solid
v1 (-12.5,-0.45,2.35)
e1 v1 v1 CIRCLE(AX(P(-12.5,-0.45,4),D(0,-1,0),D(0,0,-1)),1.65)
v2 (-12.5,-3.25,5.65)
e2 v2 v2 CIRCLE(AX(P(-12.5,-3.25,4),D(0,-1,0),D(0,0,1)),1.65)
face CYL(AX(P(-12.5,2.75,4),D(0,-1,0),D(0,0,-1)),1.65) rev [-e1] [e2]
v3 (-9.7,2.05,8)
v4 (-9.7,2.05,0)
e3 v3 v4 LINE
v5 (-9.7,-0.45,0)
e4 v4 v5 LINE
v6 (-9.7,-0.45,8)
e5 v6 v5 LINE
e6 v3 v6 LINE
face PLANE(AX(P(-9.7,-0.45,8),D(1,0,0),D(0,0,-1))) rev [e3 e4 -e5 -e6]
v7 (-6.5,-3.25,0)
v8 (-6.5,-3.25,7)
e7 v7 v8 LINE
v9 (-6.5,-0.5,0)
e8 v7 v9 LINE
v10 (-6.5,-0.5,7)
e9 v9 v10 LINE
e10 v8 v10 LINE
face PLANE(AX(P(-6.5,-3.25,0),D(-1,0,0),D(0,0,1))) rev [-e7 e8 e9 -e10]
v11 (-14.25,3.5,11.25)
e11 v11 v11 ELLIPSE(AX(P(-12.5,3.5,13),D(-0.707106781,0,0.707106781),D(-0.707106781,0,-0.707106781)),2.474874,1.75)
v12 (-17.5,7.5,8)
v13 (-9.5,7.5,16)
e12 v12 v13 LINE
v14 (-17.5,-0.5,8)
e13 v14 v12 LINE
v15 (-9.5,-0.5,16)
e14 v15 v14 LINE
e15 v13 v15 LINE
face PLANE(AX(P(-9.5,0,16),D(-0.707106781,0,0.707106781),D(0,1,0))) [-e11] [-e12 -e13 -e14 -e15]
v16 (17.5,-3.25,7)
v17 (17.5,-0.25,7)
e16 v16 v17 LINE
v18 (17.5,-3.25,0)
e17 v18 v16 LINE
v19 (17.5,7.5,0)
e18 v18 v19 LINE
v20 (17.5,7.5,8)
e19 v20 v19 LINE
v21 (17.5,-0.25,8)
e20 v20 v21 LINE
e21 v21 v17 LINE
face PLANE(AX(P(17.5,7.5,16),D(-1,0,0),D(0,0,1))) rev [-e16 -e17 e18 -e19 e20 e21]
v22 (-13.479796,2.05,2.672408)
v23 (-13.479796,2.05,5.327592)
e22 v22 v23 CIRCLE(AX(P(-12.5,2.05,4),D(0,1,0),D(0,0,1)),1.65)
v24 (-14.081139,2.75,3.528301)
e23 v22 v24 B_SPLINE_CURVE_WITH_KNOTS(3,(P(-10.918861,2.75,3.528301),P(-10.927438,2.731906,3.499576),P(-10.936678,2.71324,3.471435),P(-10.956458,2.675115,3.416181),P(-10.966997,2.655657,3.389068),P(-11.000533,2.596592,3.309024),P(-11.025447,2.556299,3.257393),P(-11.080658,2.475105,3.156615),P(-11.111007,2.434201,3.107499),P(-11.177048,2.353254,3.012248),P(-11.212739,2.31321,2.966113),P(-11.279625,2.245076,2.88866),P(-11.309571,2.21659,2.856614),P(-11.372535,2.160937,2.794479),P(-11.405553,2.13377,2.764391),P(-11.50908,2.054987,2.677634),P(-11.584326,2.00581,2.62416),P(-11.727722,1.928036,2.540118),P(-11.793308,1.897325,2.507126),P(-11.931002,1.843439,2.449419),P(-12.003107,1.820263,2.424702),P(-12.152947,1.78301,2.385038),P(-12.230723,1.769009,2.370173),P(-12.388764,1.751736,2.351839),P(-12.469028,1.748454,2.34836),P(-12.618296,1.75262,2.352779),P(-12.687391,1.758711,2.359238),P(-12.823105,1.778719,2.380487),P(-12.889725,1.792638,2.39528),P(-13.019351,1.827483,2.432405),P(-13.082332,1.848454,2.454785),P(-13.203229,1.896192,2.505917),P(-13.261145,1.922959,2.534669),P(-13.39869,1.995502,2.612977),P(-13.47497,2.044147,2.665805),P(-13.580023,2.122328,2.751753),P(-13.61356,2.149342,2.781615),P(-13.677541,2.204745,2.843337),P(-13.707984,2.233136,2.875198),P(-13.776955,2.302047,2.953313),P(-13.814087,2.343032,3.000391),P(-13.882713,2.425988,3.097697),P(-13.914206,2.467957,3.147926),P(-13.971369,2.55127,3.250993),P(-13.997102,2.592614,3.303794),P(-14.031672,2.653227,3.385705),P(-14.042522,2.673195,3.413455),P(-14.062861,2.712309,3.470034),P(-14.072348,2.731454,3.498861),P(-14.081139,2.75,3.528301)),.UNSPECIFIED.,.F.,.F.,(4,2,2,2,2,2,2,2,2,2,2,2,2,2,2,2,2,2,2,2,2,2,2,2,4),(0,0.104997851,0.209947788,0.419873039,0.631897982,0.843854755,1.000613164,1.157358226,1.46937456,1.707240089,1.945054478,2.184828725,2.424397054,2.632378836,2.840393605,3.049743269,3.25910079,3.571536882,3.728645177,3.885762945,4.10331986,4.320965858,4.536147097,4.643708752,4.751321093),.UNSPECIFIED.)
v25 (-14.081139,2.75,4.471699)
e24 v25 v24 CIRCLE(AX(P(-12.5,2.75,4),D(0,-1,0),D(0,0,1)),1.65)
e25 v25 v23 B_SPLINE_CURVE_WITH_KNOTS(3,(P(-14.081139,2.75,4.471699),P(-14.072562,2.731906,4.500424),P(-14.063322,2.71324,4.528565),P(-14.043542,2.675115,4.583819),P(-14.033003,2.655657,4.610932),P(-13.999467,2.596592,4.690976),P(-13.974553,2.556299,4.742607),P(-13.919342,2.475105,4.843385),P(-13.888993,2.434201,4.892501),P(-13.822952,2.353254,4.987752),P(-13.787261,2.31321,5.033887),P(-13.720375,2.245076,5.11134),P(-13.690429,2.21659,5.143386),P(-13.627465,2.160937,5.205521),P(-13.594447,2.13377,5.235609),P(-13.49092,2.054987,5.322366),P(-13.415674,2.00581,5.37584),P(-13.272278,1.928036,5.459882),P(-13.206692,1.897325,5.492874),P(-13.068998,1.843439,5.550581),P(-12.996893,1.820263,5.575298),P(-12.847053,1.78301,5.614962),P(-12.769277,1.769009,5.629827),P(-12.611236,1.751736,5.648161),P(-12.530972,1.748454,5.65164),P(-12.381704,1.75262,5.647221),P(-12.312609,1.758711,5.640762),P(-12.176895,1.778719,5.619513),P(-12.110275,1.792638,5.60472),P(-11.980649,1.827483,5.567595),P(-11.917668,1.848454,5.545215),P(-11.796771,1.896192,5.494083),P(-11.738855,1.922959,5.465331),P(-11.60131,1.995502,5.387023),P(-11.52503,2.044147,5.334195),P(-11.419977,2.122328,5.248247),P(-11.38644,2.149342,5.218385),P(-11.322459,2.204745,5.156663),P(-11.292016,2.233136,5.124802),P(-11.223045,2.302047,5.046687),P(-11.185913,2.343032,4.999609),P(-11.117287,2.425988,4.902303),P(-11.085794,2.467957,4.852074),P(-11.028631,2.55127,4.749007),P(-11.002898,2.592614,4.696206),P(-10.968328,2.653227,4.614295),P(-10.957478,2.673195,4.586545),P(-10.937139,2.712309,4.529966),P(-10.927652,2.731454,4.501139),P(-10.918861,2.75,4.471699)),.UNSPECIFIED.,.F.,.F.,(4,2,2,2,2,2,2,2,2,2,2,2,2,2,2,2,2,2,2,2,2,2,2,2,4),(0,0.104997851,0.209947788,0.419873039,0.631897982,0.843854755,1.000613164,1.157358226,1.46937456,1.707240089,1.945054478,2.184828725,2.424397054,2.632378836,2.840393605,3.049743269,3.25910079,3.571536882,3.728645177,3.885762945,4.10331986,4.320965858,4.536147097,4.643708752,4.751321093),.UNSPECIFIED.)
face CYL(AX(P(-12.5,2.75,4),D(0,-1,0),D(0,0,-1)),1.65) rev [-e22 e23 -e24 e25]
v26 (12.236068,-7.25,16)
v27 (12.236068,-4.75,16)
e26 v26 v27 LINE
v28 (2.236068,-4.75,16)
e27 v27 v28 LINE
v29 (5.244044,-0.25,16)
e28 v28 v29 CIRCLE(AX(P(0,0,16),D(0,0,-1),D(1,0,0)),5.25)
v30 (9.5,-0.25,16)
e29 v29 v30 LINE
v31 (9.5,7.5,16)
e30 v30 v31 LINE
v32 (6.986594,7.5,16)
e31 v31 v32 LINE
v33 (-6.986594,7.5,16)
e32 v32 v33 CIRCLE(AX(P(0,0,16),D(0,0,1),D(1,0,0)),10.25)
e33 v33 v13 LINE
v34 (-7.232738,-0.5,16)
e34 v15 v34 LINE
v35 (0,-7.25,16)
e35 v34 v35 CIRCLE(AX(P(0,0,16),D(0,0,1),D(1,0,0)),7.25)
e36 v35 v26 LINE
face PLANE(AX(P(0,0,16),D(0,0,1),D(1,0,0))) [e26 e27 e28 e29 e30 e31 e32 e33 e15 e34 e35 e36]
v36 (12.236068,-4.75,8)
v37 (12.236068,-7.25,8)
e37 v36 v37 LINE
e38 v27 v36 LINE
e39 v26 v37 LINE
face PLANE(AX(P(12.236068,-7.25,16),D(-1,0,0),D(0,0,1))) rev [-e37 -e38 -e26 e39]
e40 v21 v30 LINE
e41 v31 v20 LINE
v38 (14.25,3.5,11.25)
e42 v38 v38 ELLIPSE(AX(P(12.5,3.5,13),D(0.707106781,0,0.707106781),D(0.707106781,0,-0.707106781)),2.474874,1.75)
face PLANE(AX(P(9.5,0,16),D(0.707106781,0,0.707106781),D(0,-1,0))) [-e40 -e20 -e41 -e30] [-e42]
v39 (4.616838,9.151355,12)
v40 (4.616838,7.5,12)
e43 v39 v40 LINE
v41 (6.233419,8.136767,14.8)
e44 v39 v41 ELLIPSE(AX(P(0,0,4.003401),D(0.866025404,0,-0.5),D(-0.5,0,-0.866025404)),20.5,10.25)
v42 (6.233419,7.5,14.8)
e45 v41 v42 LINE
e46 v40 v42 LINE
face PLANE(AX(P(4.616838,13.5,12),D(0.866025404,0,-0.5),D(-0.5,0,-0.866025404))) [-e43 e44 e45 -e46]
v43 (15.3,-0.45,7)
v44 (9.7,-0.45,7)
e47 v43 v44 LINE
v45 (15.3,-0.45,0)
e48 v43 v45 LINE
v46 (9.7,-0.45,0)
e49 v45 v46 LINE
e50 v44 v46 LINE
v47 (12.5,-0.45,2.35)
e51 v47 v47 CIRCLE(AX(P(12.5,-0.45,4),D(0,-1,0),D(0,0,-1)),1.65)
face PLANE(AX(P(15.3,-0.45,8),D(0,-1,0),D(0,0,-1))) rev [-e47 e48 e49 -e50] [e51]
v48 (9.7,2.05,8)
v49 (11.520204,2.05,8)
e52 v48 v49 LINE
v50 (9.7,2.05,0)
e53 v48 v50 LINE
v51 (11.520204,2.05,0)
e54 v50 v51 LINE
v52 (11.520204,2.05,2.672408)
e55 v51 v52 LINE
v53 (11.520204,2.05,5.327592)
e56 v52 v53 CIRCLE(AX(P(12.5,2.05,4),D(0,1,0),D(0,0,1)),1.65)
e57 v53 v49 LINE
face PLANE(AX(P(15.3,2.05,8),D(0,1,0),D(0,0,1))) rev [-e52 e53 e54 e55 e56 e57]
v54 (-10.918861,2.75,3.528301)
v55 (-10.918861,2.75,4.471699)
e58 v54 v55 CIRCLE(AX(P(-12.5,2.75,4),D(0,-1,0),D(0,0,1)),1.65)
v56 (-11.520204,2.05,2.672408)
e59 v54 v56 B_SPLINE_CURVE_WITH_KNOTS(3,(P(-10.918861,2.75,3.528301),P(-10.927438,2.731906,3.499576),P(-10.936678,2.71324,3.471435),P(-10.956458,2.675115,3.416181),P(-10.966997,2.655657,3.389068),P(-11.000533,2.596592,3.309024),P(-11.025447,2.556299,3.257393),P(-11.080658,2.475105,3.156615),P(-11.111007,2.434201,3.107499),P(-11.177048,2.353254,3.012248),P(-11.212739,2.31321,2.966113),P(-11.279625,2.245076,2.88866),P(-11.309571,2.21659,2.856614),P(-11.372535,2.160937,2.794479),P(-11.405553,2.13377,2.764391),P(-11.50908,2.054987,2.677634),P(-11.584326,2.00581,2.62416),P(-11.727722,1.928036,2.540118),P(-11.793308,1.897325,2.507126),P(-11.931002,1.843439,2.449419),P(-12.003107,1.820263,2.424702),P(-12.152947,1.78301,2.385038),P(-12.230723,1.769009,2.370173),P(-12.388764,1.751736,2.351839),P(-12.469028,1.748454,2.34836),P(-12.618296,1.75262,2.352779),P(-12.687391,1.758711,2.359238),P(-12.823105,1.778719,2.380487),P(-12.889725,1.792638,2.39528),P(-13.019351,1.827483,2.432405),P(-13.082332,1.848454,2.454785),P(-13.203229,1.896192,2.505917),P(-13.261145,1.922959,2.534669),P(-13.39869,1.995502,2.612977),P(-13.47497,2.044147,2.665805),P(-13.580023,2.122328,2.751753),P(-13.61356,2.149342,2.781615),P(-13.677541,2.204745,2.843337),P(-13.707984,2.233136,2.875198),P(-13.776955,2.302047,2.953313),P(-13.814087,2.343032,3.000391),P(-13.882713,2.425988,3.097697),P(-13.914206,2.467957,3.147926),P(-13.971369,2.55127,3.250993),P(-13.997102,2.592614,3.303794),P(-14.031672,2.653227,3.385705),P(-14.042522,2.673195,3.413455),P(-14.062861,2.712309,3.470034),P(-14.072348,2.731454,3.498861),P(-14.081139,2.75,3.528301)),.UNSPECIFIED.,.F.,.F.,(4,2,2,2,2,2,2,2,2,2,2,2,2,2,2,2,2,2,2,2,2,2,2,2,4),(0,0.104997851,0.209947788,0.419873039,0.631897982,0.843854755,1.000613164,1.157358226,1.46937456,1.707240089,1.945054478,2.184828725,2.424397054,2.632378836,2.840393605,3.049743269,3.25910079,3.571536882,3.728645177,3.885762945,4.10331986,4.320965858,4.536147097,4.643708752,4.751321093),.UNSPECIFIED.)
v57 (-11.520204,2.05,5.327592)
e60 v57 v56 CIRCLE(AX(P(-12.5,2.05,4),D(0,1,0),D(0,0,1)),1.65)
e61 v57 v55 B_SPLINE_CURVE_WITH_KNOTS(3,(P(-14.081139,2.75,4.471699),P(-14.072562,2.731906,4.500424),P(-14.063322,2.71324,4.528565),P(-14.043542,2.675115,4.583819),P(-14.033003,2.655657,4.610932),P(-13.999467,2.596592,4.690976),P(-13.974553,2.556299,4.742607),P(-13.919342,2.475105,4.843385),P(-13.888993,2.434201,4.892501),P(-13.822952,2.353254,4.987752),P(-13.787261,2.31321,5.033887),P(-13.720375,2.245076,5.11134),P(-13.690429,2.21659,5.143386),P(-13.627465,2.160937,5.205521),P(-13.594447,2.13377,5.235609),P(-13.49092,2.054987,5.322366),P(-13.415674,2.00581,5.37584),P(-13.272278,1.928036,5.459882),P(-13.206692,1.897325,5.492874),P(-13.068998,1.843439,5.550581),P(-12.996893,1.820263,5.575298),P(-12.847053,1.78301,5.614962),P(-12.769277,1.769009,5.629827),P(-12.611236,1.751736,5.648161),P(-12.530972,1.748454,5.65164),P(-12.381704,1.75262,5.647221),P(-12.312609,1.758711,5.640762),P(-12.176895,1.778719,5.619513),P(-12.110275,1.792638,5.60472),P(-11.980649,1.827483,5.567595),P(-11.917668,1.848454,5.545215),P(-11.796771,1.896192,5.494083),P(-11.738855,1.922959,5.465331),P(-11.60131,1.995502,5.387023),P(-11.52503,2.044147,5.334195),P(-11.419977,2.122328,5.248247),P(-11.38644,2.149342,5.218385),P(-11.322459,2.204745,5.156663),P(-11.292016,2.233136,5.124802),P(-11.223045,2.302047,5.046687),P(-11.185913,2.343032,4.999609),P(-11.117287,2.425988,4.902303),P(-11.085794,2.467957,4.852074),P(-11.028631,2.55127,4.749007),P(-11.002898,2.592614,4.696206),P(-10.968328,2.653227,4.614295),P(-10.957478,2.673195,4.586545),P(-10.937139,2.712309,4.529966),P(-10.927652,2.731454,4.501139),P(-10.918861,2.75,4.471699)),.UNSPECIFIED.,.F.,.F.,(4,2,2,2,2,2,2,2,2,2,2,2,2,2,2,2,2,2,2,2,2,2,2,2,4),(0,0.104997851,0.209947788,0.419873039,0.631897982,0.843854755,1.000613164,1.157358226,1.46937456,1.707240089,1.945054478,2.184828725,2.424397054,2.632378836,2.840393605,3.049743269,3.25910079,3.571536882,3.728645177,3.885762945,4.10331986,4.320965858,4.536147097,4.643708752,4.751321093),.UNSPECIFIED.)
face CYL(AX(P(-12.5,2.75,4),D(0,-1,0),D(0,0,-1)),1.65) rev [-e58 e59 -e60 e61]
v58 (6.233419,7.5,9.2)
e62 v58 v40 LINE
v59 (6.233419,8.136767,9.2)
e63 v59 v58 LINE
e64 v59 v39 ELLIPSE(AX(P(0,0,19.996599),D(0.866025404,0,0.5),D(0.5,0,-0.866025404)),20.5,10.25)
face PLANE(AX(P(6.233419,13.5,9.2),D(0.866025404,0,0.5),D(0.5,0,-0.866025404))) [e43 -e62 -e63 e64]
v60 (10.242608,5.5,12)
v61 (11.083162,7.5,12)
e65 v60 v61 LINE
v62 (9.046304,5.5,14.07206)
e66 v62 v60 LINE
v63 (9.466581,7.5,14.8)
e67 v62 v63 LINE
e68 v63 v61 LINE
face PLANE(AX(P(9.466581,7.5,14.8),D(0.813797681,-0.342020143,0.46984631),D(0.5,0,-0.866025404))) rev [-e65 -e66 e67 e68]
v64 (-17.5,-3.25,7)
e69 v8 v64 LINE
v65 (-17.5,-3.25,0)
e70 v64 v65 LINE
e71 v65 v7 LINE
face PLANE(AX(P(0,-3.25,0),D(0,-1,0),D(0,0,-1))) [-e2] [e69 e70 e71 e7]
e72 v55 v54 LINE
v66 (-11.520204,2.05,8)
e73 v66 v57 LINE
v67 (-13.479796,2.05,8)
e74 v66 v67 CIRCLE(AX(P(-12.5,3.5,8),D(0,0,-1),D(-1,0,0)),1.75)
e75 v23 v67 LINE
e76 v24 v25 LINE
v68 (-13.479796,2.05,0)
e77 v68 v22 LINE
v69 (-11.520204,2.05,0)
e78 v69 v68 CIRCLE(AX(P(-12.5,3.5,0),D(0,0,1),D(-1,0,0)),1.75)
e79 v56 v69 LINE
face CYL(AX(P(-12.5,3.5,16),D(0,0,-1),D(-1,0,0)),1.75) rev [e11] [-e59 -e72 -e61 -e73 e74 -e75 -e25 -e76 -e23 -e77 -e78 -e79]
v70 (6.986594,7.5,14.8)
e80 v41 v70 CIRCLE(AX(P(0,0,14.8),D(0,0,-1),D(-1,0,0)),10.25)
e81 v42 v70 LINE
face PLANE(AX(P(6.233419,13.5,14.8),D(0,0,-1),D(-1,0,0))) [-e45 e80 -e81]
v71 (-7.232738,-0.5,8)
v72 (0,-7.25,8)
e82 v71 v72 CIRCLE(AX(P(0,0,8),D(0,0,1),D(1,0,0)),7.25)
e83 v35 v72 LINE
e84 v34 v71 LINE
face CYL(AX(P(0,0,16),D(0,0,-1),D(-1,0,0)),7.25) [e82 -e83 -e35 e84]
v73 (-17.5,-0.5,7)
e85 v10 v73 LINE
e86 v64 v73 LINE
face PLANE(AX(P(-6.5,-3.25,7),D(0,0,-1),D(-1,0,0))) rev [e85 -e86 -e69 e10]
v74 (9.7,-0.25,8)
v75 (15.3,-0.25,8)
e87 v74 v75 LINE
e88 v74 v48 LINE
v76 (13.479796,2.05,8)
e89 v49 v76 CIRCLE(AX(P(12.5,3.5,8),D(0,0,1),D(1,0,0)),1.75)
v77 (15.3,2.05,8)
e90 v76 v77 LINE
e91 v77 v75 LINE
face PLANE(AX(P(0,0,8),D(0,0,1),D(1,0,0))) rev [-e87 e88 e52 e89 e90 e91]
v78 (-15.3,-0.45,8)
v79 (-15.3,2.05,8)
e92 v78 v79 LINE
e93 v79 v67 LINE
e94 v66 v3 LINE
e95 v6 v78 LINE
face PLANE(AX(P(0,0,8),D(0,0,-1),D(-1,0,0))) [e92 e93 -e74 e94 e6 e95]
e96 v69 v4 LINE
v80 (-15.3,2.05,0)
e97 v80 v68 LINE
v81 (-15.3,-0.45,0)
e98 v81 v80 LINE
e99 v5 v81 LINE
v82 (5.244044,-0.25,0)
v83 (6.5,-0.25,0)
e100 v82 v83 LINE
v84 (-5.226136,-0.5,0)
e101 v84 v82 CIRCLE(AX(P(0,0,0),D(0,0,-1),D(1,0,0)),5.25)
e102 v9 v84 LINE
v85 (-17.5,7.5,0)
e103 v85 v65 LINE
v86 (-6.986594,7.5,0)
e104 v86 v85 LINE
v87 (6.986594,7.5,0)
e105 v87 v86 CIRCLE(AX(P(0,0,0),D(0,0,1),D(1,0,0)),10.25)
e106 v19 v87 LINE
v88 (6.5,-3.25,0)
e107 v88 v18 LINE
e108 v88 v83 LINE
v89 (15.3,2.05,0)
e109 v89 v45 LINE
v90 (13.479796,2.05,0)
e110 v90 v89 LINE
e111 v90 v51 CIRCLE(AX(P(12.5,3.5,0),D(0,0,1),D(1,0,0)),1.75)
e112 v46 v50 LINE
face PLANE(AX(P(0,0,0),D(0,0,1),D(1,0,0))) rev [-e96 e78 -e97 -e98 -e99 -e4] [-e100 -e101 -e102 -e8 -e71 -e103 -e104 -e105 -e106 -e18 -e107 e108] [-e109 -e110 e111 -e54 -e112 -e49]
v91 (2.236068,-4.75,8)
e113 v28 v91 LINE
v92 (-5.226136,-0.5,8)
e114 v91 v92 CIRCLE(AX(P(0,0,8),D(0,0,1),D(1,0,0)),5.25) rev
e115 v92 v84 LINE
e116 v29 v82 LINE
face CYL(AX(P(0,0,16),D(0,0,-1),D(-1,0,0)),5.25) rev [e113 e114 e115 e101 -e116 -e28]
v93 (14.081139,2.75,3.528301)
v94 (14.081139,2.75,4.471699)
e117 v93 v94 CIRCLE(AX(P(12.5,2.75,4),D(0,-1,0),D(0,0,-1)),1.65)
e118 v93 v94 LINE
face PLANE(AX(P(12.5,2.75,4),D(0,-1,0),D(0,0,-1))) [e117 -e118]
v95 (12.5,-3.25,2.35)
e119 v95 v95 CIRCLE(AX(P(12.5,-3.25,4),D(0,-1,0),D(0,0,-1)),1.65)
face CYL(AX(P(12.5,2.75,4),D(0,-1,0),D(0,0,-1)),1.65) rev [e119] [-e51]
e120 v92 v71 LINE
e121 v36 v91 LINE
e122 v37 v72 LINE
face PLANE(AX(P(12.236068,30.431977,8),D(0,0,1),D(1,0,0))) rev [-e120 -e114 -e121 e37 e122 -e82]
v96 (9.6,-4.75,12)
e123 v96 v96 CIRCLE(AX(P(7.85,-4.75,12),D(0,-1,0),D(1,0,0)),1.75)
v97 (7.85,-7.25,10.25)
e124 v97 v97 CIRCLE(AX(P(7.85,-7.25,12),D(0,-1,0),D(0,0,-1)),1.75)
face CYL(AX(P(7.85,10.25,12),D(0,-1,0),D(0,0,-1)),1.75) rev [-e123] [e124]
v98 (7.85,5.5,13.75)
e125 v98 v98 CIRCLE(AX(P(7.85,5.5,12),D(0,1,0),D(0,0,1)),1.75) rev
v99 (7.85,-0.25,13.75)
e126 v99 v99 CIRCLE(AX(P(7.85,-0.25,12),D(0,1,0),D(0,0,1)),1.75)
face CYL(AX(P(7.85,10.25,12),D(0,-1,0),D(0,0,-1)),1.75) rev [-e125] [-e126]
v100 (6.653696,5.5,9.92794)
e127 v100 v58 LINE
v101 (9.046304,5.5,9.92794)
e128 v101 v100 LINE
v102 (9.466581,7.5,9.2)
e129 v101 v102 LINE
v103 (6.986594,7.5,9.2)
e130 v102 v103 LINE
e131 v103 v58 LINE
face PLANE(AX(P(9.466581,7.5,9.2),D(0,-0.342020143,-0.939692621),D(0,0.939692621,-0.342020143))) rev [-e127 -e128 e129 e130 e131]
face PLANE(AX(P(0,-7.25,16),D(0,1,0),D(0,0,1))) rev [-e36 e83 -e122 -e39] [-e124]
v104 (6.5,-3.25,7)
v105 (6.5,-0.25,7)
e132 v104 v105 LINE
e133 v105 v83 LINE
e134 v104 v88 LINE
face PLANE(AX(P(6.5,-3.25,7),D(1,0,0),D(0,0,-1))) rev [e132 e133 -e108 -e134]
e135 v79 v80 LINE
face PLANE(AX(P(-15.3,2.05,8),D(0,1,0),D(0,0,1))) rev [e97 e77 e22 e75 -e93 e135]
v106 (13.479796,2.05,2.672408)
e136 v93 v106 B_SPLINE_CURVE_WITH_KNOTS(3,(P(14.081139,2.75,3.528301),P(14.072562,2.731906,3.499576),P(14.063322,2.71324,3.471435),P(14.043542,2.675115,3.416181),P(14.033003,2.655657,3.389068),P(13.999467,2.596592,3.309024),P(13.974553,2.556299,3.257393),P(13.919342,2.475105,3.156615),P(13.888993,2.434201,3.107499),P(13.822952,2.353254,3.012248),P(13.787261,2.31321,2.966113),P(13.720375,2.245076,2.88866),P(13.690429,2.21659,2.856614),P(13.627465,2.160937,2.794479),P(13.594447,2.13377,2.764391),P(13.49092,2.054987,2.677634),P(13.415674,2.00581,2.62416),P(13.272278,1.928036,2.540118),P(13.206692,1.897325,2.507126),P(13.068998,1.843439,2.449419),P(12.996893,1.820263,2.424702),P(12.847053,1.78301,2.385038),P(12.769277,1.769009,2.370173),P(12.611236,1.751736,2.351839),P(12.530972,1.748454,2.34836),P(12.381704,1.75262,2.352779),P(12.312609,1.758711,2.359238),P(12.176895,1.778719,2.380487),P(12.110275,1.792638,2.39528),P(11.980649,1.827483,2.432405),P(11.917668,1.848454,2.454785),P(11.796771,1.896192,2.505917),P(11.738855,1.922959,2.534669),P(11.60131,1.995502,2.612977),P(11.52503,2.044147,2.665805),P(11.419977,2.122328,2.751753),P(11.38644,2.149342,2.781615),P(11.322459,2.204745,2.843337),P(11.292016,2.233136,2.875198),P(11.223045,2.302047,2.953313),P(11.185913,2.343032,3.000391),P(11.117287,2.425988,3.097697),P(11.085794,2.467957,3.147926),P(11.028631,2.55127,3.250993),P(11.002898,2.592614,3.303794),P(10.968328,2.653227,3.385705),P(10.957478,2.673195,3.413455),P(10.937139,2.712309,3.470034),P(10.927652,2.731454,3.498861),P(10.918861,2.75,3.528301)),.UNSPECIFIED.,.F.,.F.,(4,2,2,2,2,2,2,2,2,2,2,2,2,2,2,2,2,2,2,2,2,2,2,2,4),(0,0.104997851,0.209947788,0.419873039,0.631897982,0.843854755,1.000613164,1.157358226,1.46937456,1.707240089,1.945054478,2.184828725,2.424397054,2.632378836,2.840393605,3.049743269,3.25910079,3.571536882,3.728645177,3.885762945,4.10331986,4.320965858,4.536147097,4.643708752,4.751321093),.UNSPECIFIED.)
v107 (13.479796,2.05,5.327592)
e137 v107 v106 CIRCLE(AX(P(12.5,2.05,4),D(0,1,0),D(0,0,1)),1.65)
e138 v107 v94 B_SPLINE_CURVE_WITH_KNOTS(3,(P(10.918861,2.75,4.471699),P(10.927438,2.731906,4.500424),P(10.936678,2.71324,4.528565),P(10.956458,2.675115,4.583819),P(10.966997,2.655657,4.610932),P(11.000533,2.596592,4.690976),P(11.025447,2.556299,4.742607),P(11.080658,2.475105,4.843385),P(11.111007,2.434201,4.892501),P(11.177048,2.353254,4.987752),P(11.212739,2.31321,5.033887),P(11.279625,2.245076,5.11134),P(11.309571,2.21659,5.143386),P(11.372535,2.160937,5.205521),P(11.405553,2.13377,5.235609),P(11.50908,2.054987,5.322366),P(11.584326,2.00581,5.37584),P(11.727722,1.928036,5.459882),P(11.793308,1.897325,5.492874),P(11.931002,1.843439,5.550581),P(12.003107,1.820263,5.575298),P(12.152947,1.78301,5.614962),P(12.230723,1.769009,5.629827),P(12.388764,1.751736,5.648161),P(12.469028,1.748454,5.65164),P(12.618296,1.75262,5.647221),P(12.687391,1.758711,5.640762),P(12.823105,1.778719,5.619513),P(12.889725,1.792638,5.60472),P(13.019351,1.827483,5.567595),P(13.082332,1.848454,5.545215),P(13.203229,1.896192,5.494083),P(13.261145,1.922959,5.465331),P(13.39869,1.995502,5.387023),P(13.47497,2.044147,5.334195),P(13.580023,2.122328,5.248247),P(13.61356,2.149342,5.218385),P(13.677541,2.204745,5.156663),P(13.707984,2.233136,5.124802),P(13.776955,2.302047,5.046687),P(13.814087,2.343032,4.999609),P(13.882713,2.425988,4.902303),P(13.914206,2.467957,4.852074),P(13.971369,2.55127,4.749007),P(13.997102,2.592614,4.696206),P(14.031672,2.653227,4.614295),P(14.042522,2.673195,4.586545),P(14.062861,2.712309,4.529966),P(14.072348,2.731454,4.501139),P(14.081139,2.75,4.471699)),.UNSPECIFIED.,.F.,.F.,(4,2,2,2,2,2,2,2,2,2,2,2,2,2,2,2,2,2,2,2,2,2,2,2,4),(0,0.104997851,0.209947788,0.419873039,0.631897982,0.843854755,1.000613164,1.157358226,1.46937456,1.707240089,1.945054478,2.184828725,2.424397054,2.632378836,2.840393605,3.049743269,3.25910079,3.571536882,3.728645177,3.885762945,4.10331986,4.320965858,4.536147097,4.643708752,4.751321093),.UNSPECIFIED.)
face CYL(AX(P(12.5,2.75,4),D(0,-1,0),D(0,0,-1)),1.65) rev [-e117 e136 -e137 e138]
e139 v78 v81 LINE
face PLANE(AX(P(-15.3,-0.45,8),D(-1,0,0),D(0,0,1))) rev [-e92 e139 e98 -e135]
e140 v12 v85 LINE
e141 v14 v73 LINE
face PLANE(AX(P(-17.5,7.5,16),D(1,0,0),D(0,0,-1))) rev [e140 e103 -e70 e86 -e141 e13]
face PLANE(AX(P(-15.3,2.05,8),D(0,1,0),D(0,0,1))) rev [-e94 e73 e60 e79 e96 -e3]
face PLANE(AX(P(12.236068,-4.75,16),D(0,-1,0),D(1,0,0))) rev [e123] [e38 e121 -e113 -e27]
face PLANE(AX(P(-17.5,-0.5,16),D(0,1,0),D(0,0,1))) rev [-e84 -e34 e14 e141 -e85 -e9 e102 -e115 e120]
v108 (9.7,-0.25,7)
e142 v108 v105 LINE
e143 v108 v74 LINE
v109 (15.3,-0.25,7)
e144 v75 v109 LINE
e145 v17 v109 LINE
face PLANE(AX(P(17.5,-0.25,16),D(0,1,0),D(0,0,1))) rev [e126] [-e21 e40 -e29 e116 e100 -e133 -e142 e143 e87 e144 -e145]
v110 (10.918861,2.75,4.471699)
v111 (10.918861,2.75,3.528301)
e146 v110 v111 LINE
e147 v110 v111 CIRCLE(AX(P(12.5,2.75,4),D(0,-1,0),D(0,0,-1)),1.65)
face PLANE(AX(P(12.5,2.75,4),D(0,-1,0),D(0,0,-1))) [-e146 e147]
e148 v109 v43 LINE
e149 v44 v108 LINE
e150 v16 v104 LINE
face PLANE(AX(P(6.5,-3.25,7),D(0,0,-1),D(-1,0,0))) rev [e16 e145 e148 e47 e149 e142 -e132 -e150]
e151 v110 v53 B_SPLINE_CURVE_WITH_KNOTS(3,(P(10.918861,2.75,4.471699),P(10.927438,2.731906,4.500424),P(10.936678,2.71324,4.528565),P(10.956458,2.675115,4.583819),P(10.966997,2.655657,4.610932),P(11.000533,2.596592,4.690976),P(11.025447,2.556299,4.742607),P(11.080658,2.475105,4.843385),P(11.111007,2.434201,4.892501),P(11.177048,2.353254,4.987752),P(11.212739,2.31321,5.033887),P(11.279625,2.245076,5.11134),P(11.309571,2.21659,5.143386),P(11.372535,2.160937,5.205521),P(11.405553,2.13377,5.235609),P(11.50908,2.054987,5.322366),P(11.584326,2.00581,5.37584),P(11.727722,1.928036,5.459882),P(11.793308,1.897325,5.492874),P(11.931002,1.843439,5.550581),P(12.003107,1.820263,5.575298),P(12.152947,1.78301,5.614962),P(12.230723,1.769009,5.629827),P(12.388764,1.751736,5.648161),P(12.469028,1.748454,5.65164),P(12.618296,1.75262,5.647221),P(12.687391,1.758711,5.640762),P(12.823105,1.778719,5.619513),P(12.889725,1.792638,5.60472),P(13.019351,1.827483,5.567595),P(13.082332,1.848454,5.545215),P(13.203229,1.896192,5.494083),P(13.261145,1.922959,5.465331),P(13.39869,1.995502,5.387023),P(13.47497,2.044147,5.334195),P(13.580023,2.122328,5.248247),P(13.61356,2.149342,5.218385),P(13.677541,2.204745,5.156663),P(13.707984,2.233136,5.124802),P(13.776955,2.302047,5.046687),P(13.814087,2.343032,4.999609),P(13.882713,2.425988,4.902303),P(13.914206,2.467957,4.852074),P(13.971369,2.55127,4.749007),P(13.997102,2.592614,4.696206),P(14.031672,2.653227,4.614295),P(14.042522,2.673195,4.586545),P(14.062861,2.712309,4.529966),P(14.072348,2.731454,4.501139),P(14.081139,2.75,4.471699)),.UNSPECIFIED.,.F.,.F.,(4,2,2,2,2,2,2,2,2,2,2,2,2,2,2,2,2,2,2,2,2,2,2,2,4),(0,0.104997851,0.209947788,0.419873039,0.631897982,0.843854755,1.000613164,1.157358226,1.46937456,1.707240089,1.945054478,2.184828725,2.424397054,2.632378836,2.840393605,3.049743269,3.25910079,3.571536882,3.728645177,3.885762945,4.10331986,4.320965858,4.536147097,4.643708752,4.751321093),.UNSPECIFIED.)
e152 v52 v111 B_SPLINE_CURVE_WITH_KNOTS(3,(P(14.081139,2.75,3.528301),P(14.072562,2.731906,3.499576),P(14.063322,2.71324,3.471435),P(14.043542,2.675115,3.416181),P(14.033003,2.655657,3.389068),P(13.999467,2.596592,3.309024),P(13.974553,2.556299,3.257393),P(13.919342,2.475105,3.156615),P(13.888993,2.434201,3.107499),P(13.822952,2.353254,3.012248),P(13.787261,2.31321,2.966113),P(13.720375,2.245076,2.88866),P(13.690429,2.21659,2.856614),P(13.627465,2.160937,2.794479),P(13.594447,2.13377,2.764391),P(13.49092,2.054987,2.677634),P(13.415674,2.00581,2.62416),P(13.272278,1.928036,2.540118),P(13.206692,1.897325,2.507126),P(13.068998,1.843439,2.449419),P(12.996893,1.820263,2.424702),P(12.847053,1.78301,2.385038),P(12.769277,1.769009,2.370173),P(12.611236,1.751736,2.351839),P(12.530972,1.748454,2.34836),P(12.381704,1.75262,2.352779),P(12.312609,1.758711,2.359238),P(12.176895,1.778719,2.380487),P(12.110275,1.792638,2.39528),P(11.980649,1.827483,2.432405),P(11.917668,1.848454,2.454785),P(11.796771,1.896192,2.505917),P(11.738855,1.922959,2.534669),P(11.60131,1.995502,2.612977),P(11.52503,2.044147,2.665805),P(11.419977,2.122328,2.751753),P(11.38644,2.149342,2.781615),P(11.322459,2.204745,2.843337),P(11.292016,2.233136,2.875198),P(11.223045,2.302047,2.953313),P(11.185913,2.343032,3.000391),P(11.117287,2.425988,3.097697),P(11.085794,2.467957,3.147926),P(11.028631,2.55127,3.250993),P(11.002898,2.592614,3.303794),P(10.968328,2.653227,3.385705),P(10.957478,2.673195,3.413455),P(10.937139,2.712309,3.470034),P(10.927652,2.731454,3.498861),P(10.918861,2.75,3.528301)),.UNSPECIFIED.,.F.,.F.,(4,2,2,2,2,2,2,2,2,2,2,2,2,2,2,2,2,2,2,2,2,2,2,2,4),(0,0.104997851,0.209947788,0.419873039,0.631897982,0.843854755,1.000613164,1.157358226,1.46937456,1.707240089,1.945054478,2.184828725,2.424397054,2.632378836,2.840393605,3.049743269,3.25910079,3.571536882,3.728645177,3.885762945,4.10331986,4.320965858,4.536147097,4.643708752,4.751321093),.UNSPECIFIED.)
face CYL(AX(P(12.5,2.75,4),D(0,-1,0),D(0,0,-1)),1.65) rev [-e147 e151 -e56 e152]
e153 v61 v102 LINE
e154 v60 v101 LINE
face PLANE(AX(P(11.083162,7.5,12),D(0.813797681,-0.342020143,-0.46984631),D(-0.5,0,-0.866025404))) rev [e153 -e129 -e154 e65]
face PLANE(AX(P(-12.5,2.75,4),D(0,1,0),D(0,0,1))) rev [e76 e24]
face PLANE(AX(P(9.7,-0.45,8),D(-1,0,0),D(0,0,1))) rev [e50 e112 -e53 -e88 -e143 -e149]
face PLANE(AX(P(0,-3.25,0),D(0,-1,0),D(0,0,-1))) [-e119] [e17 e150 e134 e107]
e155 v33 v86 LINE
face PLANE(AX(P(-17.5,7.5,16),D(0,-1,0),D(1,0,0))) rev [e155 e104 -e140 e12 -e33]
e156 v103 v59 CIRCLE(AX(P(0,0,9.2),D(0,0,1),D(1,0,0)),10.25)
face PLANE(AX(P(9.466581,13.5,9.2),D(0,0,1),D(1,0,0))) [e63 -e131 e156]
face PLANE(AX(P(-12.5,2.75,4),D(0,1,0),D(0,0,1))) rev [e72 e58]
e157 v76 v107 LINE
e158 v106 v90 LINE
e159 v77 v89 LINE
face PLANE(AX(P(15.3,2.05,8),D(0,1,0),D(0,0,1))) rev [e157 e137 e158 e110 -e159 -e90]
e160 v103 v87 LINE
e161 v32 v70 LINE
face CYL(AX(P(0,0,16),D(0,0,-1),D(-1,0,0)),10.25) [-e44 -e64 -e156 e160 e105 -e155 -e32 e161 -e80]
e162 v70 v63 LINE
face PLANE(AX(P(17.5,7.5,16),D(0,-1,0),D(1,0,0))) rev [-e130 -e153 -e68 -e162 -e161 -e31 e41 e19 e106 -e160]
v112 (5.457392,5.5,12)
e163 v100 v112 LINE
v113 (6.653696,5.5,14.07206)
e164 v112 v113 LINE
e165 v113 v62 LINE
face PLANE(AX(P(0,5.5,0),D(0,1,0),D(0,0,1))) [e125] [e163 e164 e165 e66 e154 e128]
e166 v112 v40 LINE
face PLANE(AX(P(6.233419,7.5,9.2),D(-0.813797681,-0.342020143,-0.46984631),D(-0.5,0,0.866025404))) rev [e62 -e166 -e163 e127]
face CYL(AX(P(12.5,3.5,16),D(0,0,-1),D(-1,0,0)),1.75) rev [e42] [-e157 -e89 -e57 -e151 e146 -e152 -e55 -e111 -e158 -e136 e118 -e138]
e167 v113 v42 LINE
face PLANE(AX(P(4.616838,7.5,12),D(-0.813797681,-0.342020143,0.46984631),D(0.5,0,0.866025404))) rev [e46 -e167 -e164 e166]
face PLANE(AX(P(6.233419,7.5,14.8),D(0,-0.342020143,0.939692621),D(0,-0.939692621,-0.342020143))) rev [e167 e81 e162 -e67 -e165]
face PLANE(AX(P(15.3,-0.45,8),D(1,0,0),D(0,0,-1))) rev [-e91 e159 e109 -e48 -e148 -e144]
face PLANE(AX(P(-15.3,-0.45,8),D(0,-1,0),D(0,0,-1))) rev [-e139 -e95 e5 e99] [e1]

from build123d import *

# Parameters (mm, degrees)
ESBO_O1_R                       = 1.75
RESSALTO_EXTRUS_O1_DEPTH        = 16
ESBO_O3_R                       = 1.75
CORTE_EXTRUS_O2_DEPTH           = 30.470324057
CORTE_EXTRUS_O3_DEPTH           = 2
CORTE_EXTRUS_O3_TAPER           = 20
CORTE_EXTRUS_O3_OTHER_WAY_DEPTH = 6
CORTE_EXTRUS_O4_REACH           = 31.47
ESBO_O5_W                       = 29.879545061
ESBO_O5_H                       = 8
ESBO_O6_W                       = 11
ESBO_O6_H                       = 7
RESSALTO_EXTRUS_O2_DEPTH        = 3
ESBO_O7_W                       = 5.6
ESBO_O7_H                       = 2.5
CORTE_EXTRUS_O6_DEPTH           = 8
ESBO_O8_R                       = 1.65
CORTE_EXTRUS_O7_DEPTH           = 6
CHANFRO1_SIZE                   = 8


with BuildPart() as part:
    # Esboço1 → Ressalto-extrusão1 (new body)
    with BuildSketch(Plane.XY):
        with BuildLine():
            Line((17.5, 7.5), (6.986594306, 7.5))
            ThreePointArc((6.986594306, 7.5), (0, 10.25), (-6.986594306, 7.5))
            Line((-6.986594306, 7.5), (-17.5, 7.5))
            Line((-17.5, 7.5), (-17.5, -0.5))
            Line((-17.5, -0.5), (-7.232738071, -0.5))
            ThreePointArc((-7.232738071, -0.5), (-4.946589734, -5.300353762), (0, -7.25))
            Line((0, -7.25), (12.236067977, -7.25))
            Line((12.236067977, -7.25), (12.236067977, -4.75))
            Line((12.236067977, -4.75), (2.236067977, -4.75))
            ThreePointArc((2.236067977, -4.75), (-4.364690104, 2.917529829), (5.244044241, -0.25))
            Line((5.244044241, -0.25), (12.736067977, -0.25))
            Line((12.736067977, -0.25), (15.807189139, -0.25))
            Line((15.807189139, -0.25), (17.5, -0.25))
            Line((17.5, -0.25), (17.5, 7.5))
        make_face()
        with Locations((12.5, 3.5)):
            Circle(ESBO_O1_R, mode=Mode.SUBTRACT)
        with Locations(Location((-12.5, 3.5, 0), (0, 0, 180))):
            Circle(ESBO_O1_R, mode=Mode.SUBTRACT)
    extrude(amount=RESSALTO_EXTRUS_O1_DEPTH)

    # Esboço3 → Corte-extrusão2 (cut, through all)
    with BuildSketch(Plane.XZ.offset(7.25)):
        with Locations(Location((7.85, 12, 0), (0, 0, 240.437367967))):
            Circle(ESBO_O3_R)
    extrude(amount=-CORTE_EXTRUS_O2_DEPTH, mode=Mode.SUBTRACT)

    # Esboço4 → Corte-extrusão3 (cut)
    with BuildSketch(Plane(origin=(0, 7.5, 0), x_dir=(1, 0, 0), z_dir=(0, 1, 0))):
        Polygon((11.083161507, -12), (9.466580754, -9.2), (6.233419246, -9.2), (4.616838493, -12), (6.233419246, -14.8), (9.466580754, -14.8), align=None)
    extrude(amount=-CORTE_EXTRUS_O3_DEPTH, taper=CORTE_EXTRUS_O3_TAPER, mode=Mode.SUBTRACT)

    # Esboço4 → Corte-extrusão3 other way (cut)
    with BuildSketch(Plane(origin=(0, 7.5, 0), x_dir=(1, 0, 0), z_dir=(0, 1, 0))):
        Polygon((11.083161507, -12), (9.466580754, -9.2), (6.233419246, -9.2), (4.616838493, -12), (6.233419246, -14.8), (9.466580754, -14.8), align=None)
    extrude(amount=CORTE_EXTRUS_O3_OTHER_WAY_DEPTH, mode=Mode.SUBTRACT)

    # Corte-extrusão4: up to this face of the body (flat: up to its plane)
    corte_extrus_o4_end = Plane(part.part.faces().sort_by_distance((-12.366369035, -0.5, 8))[0])
    # Esboço5 → Corte-extrusão4 (cut, up to the picked face)
    with BuildSketch(Plane.XZ.offset(7.25), mode=Mode.PRIVATE) as corte_extrus_o4_sk1:
        with Locations((-2.703704553, 4)):
            Rectangle(ESBO_O5_W, ESBO_O5_H)
    corte_extrus_o4_tool1 = split(extrude(corte_extrus_o4_sk1.sketch, amount=-CORTE_EXTRUS_O4_REACH, mode=Mode.PRIVATE), bisect_by=corte_extrus_o4_end, keep=Keep.BOTH, mode=Mode.PRIVATE)
    add(corte_extrus_o4_tool1.solids().sort_by(Axis((-2.703705, -7.25, 4), (0, 1, 0)))[0], mode=Mode.SUBTRACT)

    # Esboço6 → Ressalto-extrusão2 (add)
    with BuildSketch(Plane.XZ.offset(0.25)):
        with Locations((12, 3.5)):
            Rectangle(ESBO_O6_W, ESBO_O6_H)
        with Locations((-12, 3.5)):
            Rectangle(ESBO_O6_W, ESBO_O6_H)
    extrude(amount=RESSALTO_EXTRUS_O2_DEPTH)

    # Esboço7 → Corte-extrusão6 (cut)
    with BuildSketch(Plane(origin=(0, 0, 0), x_dir=(-1, 0, 0), z_dir=(0, 0, -1))):
        with Locations((-12.5, 0.8)):
            Rectangle(ESBO_O7_W, ESBO_O7_H)
        with Locations((12.5, 0.8)):
            Rectangle(ESBO_O7_W, ESBO_O7_H)
    extrude(amount=-CORTE_EXTRUS_O6_DEPTH, mode=Mode.SUBTRACT)

    # Esboço8 → Corte-extrusão7 (cut)
    with BuildSketch(Plane.XZ.offset(3.25)):
        with Locations(Location((12.5, 4, 0), (0, 0, 270))):
            Circle(ESBO_O8_R)
        with Locations(Location((-12.5, 4, 0), (0, 0, 270))):
            Circle(ESBO_O8_R)
    extrude(amount=-CORTE_EXTRUS_O7_DEPTH, mode=Mode.SUBTRACT)

    # Chanfro1
    # the kernel refuses this chamfer: 8 mm, written as the material it takes off along each edge
    with BuildSketch(Plane(origin=(17.5, -20.823463904, 16), x_dir=(0.027495876610586487, 0, -0.9996219169112968), z_dir=(0, 1, 0))) as chanfro1_piece_1_section:
        Polygon((CHANFRO1_SIZE * 0.999621916911, CHANFRO1_SIZE * 0.0274958766106), (-CHANFRO1_SIZE * 0.0274958766106, CHANFRO1_SIZE * 0.999621916911), (0, 0), align=None)
    chanfro1_piece_1 = extrude(amount=48.896927807, mode=Mode.PRIVATE)
    chanfro1_piece_1 = split(chanfro1_piece_1, bisect_by=Plane(origin=(15.518542318, -4.75, 12.990728841), z_dir=(0, 1, 0)), keep=Keep.TOP, mode=Mode.PRIVATE)
    add(chanfro1_piece_1, mode=Mode.SUBTRACT)
    with BuildSketch(Plane(origin=(-17.5, 28.073463904, 16), x_dir=(0.9996219169112968, 0, 0.027495876610586494), z_dir=(0, -1, 0))) as chanfro1_piece_2:
        Polygon((CHANFRO1_SIZE * 0.999621916911, -CHANFRO1_SIZE * 0.0274958766106), (-CHANFRO1_SIZE * 0.0274958766106, -CHANFRO1_SIZE * 0.999621916911), (0, 0), align=None)
    extrude(amount=49.146927807, mode=Mode.SUBTRACT)


solid = part.part
